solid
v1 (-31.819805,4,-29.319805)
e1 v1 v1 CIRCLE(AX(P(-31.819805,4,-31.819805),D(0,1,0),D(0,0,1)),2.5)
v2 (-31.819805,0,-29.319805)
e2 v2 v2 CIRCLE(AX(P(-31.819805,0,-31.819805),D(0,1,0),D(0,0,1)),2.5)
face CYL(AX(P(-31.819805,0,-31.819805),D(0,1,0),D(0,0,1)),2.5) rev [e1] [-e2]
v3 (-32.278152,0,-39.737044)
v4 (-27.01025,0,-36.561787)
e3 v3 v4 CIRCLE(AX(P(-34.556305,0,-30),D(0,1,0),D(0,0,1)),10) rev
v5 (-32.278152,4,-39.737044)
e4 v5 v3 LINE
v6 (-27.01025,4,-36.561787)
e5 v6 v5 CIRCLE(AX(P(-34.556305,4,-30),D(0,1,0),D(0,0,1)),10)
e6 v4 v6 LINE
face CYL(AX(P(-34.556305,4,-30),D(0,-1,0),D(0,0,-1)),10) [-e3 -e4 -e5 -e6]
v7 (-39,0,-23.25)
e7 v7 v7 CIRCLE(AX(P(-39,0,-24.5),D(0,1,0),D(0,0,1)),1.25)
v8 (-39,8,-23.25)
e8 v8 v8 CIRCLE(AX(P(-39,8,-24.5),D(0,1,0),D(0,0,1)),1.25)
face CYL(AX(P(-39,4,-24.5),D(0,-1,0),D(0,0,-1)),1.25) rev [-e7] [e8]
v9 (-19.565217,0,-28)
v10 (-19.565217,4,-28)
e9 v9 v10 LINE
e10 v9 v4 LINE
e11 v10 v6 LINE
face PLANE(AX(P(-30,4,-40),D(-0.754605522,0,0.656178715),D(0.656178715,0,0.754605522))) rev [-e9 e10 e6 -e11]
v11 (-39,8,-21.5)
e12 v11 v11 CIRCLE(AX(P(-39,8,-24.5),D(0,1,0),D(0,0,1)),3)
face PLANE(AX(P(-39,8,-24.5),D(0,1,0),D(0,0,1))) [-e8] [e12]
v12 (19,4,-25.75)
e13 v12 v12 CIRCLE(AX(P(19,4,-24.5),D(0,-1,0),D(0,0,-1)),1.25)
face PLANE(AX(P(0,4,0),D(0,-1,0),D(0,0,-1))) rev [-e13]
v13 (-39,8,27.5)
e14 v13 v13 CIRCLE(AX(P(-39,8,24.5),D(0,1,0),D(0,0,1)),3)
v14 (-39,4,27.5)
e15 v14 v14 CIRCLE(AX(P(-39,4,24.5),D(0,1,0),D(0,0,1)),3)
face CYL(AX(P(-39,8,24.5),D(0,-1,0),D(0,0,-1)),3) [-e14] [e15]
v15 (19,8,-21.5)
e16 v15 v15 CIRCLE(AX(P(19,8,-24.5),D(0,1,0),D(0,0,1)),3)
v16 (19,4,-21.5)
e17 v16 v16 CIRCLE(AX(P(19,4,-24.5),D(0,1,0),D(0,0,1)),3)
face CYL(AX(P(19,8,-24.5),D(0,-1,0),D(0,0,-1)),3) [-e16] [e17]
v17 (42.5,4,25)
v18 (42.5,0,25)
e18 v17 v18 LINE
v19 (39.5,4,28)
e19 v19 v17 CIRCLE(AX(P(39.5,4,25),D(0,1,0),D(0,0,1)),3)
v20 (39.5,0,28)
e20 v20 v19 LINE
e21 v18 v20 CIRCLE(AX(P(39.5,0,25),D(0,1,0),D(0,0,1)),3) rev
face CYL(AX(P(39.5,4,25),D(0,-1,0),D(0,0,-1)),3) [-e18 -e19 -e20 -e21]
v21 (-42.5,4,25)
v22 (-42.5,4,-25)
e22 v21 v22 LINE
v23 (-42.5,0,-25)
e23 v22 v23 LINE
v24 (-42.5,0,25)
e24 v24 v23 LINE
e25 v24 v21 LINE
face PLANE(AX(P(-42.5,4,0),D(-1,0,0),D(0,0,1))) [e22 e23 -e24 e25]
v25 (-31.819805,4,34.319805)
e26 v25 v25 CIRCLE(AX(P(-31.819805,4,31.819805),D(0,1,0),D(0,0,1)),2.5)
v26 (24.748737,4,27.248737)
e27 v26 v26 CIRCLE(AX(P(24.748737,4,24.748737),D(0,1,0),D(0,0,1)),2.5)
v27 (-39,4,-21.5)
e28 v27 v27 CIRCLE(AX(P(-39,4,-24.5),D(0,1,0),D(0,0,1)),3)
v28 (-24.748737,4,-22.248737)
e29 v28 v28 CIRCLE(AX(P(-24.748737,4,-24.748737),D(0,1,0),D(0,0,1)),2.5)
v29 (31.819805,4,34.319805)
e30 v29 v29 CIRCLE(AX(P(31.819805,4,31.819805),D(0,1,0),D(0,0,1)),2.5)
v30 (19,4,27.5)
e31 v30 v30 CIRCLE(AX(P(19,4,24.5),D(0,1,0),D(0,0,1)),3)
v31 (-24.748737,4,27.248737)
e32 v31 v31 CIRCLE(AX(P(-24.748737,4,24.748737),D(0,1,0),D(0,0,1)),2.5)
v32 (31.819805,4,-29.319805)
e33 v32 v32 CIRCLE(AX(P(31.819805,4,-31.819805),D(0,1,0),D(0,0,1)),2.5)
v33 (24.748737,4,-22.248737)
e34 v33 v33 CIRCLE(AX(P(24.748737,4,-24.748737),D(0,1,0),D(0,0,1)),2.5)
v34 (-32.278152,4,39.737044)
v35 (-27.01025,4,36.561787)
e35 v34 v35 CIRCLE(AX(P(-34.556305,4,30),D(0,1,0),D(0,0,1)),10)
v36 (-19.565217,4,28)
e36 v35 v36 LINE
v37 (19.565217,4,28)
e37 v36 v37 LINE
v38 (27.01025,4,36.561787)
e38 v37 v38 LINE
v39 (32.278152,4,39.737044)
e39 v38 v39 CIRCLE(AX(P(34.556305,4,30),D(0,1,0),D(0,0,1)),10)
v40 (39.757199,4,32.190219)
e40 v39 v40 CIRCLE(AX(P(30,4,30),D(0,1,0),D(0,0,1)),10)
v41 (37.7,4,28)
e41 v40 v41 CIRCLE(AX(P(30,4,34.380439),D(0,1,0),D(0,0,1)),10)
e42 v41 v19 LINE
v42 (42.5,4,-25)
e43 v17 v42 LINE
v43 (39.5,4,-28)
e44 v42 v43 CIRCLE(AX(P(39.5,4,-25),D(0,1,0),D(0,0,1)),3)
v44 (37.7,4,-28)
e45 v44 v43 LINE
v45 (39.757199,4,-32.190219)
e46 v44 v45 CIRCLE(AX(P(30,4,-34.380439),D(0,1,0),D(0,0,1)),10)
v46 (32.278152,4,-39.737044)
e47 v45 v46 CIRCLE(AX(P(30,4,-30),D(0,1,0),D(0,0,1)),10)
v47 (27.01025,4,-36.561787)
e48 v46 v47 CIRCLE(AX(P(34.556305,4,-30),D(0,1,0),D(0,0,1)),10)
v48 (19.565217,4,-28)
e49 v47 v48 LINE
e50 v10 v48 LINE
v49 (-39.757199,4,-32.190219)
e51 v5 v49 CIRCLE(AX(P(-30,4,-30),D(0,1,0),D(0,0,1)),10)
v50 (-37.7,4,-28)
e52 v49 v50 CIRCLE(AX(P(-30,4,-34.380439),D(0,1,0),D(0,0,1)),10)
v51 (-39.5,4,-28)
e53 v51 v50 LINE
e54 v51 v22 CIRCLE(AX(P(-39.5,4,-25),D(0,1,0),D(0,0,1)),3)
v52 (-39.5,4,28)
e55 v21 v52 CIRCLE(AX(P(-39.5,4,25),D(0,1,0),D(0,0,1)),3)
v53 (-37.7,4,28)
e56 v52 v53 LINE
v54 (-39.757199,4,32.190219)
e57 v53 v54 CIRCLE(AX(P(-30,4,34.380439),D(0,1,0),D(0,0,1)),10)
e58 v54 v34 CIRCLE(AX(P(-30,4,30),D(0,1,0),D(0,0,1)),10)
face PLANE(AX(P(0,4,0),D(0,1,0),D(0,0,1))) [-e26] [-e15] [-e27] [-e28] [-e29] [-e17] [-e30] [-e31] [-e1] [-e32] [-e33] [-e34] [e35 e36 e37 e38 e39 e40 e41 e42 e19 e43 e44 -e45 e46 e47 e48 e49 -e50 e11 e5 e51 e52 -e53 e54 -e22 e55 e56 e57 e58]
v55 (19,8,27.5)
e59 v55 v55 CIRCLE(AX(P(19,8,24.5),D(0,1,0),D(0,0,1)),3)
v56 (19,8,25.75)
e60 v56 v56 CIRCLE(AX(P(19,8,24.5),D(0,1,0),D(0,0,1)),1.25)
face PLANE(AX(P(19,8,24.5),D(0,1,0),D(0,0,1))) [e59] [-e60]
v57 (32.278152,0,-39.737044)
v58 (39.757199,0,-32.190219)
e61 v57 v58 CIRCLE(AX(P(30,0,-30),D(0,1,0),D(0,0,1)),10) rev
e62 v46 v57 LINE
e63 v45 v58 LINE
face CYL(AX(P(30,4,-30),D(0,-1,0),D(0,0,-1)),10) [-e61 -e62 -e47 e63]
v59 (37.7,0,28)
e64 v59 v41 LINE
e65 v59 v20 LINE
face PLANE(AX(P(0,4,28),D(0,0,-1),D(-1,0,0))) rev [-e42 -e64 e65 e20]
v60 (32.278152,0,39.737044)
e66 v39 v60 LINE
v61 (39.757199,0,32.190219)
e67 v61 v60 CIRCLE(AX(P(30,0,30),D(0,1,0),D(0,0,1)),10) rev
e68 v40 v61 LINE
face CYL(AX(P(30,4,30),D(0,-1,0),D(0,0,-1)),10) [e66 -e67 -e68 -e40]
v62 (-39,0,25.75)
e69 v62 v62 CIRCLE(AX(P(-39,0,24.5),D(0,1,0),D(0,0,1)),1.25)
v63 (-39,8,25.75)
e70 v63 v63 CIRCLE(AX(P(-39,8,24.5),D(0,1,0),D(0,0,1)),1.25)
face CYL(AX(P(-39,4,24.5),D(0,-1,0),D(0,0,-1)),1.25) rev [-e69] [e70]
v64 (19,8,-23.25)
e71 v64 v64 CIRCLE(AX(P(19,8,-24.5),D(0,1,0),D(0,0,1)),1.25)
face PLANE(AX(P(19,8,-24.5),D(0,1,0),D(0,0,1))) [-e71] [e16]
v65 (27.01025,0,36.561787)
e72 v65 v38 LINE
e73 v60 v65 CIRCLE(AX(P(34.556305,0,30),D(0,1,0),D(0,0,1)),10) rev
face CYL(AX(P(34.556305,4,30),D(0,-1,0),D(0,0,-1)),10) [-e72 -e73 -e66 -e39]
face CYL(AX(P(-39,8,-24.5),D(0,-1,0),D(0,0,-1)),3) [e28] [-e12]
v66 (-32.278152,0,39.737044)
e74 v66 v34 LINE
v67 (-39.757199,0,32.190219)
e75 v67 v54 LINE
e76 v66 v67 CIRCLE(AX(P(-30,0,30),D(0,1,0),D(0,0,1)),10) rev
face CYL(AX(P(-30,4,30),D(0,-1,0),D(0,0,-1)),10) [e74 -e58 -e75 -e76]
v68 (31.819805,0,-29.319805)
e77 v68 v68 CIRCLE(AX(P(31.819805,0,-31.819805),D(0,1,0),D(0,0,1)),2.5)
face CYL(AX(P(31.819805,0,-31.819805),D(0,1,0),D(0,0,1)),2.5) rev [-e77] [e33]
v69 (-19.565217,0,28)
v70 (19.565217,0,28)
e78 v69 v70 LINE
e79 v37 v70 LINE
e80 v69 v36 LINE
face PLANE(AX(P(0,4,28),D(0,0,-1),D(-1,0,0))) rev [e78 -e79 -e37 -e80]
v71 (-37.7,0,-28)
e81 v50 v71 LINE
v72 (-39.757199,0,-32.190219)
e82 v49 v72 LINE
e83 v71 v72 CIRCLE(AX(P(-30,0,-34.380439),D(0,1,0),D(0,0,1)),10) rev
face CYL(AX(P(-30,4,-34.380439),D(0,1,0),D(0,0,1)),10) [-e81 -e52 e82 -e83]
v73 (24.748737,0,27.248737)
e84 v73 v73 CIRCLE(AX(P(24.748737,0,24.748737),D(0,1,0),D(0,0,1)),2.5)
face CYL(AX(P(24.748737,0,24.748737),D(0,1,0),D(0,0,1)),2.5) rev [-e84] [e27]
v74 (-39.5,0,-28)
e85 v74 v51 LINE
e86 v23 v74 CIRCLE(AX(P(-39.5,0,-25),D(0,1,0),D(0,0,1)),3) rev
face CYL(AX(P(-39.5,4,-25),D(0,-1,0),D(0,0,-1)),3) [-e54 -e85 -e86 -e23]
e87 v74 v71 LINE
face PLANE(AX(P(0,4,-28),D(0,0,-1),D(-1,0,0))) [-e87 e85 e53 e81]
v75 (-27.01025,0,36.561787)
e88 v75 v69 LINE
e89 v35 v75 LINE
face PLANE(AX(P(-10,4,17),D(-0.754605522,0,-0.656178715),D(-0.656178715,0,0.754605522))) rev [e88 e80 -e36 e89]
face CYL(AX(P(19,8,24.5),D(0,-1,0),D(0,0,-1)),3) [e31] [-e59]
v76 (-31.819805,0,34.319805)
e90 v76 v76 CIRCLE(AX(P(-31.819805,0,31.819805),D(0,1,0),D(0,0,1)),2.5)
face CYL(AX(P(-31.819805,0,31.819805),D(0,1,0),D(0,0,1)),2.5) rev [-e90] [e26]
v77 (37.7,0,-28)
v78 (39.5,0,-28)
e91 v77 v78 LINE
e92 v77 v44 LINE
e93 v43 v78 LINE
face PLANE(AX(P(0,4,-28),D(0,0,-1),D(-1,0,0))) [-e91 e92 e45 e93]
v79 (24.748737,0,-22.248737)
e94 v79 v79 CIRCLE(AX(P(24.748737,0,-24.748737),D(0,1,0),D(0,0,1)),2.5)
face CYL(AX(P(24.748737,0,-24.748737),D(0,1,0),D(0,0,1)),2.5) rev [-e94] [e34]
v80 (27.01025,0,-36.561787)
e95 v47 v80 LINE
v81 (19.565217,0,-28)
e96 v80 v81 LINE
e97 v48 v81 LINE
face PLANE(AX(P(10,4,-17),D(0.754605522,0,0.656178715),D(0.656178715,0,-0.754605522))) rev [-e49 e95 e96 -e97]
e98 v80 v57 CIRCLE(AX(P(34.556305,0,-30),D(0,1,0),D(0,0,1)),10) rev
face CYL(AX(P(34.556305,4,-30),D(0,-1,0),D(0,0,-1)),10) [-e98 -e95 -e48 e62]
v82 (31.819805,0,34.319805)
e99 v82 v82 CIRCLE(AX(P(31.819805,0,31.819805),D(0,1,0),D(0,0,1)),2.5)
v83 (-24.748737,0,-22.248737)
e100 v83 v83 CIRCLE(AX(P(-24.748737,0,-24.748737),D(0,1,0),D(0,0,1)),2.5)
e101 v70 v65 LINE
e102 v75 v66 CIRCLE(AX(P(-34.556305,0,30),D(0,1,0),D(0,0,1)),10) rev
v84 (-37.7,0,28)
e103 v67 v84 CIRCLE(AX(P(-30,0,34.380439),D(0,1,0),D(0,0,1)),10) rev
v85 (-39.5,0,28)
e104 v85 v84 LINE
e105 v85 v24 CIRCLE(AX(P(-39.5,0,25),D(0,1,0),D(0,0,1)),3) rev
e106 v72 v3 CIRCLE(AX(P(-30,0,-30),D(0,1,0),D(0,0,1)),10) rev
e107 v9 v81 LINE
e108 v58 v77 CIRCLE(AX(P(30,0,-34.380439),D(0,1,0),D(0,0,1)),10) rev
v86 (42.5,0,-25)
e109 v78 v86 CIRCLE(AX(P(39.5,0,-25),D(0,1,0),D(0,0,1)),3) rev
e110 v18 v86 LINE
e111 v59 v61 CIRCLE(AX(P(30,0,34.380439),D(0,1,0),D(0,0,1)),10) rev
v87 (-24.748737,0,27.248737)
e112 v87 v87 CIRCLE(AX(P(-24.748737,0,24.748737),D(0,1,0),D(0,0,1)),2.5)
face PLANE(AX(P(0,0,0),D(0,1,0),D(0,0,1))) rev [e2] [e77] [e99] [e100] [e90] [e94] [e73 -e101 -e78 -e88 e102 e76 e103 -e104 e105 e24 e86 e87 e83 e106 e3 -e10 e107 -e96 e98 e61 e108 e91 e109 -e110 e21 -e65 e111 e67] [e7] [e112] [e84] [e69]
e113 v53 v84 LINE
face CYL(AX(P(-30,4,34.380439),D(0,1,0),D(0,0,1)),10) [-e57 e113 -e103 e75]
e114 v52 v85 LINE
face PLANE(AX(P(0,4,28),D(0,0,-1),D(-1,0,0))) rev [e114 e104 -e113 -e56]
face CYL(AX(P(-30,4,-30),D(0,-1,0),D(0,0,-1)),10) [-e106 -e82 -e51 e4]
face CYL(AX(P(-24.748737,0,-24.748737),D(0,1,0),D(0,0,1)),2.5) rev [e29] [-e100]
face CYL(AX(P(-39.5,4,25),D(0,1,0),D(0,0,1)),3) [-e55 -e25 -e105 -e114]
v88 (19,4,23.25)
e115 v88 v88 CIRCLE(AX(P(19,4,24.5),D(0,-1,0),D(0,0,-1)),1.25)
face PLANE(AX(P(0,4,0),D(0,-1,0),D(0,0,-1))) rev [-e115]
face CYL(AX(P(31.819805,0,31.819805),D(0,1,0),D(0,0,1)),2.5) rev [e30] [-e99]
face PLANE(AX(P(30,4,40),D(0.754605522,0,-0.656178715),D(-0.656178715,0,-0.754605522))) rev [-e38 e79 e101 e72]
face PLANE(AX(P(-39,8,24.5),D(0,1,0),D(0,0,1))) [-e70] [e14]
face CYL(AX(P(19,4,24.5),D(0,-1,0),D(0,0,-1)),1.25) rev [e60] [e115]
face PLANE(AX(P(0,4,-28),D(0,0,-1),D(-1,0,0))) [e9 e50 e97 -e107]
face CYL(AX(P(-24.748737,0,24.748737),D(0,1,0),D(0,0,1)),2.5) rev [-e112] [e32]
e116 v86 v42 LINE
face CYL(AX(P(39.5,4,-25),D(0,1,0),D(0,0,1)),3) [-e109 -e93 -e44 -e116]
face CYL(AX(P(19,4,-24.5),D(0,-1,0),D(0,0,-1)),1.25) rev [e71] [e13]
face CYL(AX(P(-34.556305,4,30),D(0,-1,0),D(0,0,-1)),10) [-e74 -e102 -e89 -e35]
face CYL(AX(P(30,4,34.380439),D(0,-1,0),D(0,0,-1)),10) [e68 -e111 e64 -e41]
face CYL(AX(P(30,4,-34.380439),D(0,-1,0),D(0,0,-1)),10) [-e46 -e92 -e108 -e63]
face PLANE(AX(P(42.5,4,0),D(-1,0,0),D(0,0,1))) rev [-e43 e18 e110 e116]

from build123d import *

# Parameters (mm, degrees)
SKETCH1_W           = 85
SKETCH1_H           = 56
SKETCH1_R           = 1.25
BOSS_EXTRUDE1_DEPTH = 4
SKETCH2_R           = 3
SKETCH2_R_2         = 1.25
BOSS_EXTRUDE2_DEPTH = 4
FILLET1_R           = 3
BOSS_EXTRUDE4_DEPTH = 4
SKETCH3_R           = 2.5
CUT_EXTRUDE1_DEPTH  = 59.5
FILLET2_R           = 10


with BuildPart() as part:
    # Sketch1 → Boss-Extrude1 (new body)
    with BuildSketch(Plane(origin=(0, 0, 0), x_dir=(1, 0, 0), z_dir=(0, 1, 0))):
        Rectangle(SKETCH1_W, SKETCH1_H)
        with Locations(Location((-39, 24.5, 0), (0, 0, 270))):
            Circle(SKETCH1_R, mode=Mode.SUBTRACT)
        with Locations(Location((-39, -24.5, 0), (0, 0, 270))):
            Circle(SKETCH1_R, mode=Mode.SUBTRACT)
        with Locations(Location((19, 24.5, 0), (0, 0, 270))):
            Circle(SKETCH1_R, mode=Mode.SUBTRACT)
        with Locations(Location((19, -24.5, 0), (0, 0, 270))):
            Circle(SKETCH1_R, mode=Mode.SUBTRACT)
    extrude(amount=BOSS_EXTRUDE1_DEPTH)

    # Sketch2 → Boss-Extrude2 (add)
    # profile 1 of 4: a face of its own
    with BuildSketch(Plane(origin=(0, 4, 0), x_dir=(1, 0, 0), z_dir=(0, 1, 0))):
        with Locations(Location((-39, 24.5, 0), (0, 0, 270))):
            Circle(SKETCH2_R)
        with Locations(Location((-39, 24.5, 0), (0, 0, 270))):
            Circle(SKETCH2_R_2, mode=Mode.SUBTRACT)
    # profile 2 of 4: a face of its own
    with BuildSketch(Plane(origin=(0, 4, 0), x_dir=(1, 0, 0), z_dir=(0, 1, 0))):
        with Locations(Location((19, 24.5, 0), (0, 0, 270))):
            Circle(SKETCH2_R)
        with Locations(Location((19, 24.5, 0), (0, 0, 270))):
            Circle(SKETCH2_R_2, mode=Mode.SUBTRACT)
    # profile 3 of 4: a face of its own
    with BuildSketch(Plane(origin=(0, 4, 0), x_dir=(1, 0, 0), z_dir=(0, 1, 0))):
        with Locations(Location((19, -24.5, 0), (0, 0, 270))):
            Circle(SKETCH2_R)
        with Locations(Location((19, -24.5, 0), (0, 0, 270))):
            Circle(SKETCH2_R_2, mode=Mode.SUBTRACT)
    # profile 4 of 4: a face of its own
    with BuildSketch(Plane(origin=(0, 4, 0), x_dir=(1, 0, 0), z_dir=(0, 1, 0))):
        with Locations(Location((-39, -24.5, 0), (0, 0, 270))):
            Circle(SKETCH2_R)
        with Locations(Location((-39, -24.5, 0), (0, 0, 270))):
            Circle(SKETCH2_R_2, mode=Mode.SUBTRACT)
    extrude(amount=BOSS_EXTRUDE2_DEPTH)

    # Fillet1
    fillet1_edges = [part.edges().sort_by_distance(p)[0] for p in [
        (-42.5, 2, 28),
        (-42.5, 2, -28),
        (42.5, 2, -28),
        (42.5, 2, 28),
    ]]
    fillet(fillet1_edges, radius=FILLET1_R)

    # Sketch5 → Boss-Extrude4 (add)
    with BuildSketch(Plane(origin=(0, 0, 0), x_dir=(1, 0, 0), z_dir=(0, 1, 0))):
        Polygon((-40, -30), (-17, -10), (-17, 10), (-40, 30), (-40, 40), (-30, 40), (-10, 17), (10, 17), (30, 40), (40, 40), (40, 30), (17, 10), (17, -10), (40, -30), (40, -40), (30, -40), (10, -17), (-10, -17), (-30, -40), (-40, -40), align=None)
    extrude(amount=BOSS_EXTRUDE4_DEPTH)

    # Sketch3 → Cut-Extrude1 (cut, through all)
    with BuildSketch(Plane(origin=(0, 4, 0), x_dir=(1, 0, 0), z_dir=(0, 1, 0))):
        with Locations(Location((-31.819805153, 31.819805153, 0), (0, 0, 270))):
            Circle(SKETCH3_R)
        with Locations(Location((-24.748737342, 24.748737342, 0), (0, 0, 270))):
            Circle(SKETCH3_R)
        with Locations(Location((31.819805153, 31.819805153, 0), (0, 0, 270))):
            Circle(SKETCH3_R)
        with Locations(Location((24.748737342, 24.748737342, 0), (0, 0, 270))):
            Circle(SKETCH3_R)
        with Locations(Location((24.748737342, -24.748737342, 0), (0, 0, 270))):
            Circle(SKETCH3_R)
        with Locations(Location((31.819805153, -31.819805153, 0), (0, 0, 270))):
            Circle(SKETCH3_R)
        with Locations(Location((-31.819805153, -31.819805153, 0), (0, 0, 270))):
            Circle(SKETCH3_R)
        with Locations(Location((-24.748737342, -24.748737342, 0), (0, 0, 270))):
            Circle(SKETCH3_R)
    extrude(amount=-CUT_EXTRUDE1_DEPTH, mode=Mode.SUBTRACT)

    # Fillet2
    # the kernel refuses this fillet: 10 mm, written as the material it takes off along each edge
    with BuildSketch(Plane(origin=(-40, -10.951097141, -30), x_dir=(0.7546055221635131, 0, 0.6561787149247771), z_dir=(0, 1, 0))) as fillet2_piece_1_section:
        with BuildLine():
            CenterArc((4.671704482, 9.8672905), FILLET2_R, 221.009086902, 39.646111147)
            Line((-2.87435074, 3.305503351), (-3.025271844, 3.174267608))
            Line((-3.025271844, 3.174267608), (-0.150921104, -0.131235743))
            Line((-0.150921104, -0.131235743), (0, -0.2))
            ThreePointArc((0, -0.2), (1.523975065, -0.2), (3.015475044, -0.19734581))
            Line((3.015475044, -0.19734581), (3.047950131, 0))
        make_face()
    fillet2_piece_1 = extrude(amount=25.902194282, mode=Mode.PRIVATE)
    fillet2_piece_1 = split(fillet2_piece_1, bisect_by=Plane(origin=(-39.506364614, 2, -28), z_dir=(0, 0, -1)), keep=Keep.TOP, mode=Mode.PRIVATE)
    add(fillet2_piece_1, mode=Mode.SUBTRACT)
    with BuildSketch(Plane(origin=(-40, -25, -40), x_dir=(0, 0, 1), z_dir=(0, 1, 0)), Plane(origin=(40, -25, -40), x_dir=(-1, 0, 0), z_dir=(0, 1, 0))) as fillet2_piece_2:
        with BuildLine():
            CenterArc((FILLET2_R, FILLET2_R), FILLET2_R, 180, 90)
            Line((0, FILLET2_R), (-FILLET2_R * 0.02, FILLET2_R))
            Line((-FILLET2_R * 0.02, FILLET2_R), (-FILLET2_R * 0.02, -FILLET2_R * 0.02))
            Line((-FILLET2_R * 0.02, -FILLET2_R * 0.02), (FILLET2_R, -FILLET2_R * 0.02))
            Line((FILLET2_R, -FILLET2_R * 0.02), (FILLET2_R, 0))
        make_face()
    extrude(amount=54, mode=Mode.SUBTRACT)
    with BuildSketch(Plane(origin=(-30, -11.390762292, -40), x_dir=(-1, 0, 0), z_dir=(0, 1, 0)), Plane(origin=(30, -11.390762292, -40), x_dir=(-0.6561787149247741, 0, 0.7546055221635154), z_dir=(0, 1, 0))) as fillet2_piece_3:
        with BuildLine():
            CenterArc((FILLET2_R * 0.455630491663, FILLET2_R), FILLET2_R, 221.009086902, 48.990913098)
            Line((-FILLET2_R * 0.2989750305, FILLET2_R * 0.343821285075), (-FILLET2_R * 0.314067140943, FILLET2_R * 0.330697710777))
            Line((-FILLET2_R * 0.314067140943, FILLET2_R * 0.330697710777), (-FILLET2_R * 0.00911260983327, -FILLET2_R * 0.02))
            Line((-FILLET2_R * 0.00911260983327, -FILLET2_R * 0.02), (FILLET2_R * 0.455630491663, -FILLET2_R * 0.02))
            Line((FILLET2_R * 0.455630491663, -FILLET2_R * 0.02), (FILLET2_R * 0.455630491663, 0))
        make_face()
    extrude(amount=26.781524583, mode=Mode.SUBTRACT)
    with BuildSketch(Plane(origin=(40, -10.951097141, -30), x_dir=(0, 0, -1), z_dir=(0, 1, 0))) as fillet2_piece_4_section:
        with BuildLine():
            CenterArc((4.380438856, 10), FILLET2_R, 230.353888853, 39.646111147)
            Line((-2, 2.3), (-2.127608777, 2.146))
            ThreePointArc((-2.127608777, 2.146), (-1.150921104, 1.018764257), (-0.150921104, -0.131235743))
            Line((-0.150921104, -0.131235743), (0, -0.2))
            Line((0, -0.2), (4.380438856, -0.2))
            Line((4.380438856, -0.2), (4.380438856, 0))
        make_face()
    fillet2_piece_4 = extrude(amount=25.902194282, mode=Mode.PRIVATE)
    fillet2_piece_4 = split(fillet2_piece_4, bisect_by=Plane(origin=(39.506364614, 2, -28), z_dir=(0, 0, -1)), keep=Keep.TOP, mode=Mode.PRIVATE)
    add(fillet2_piece_4, mode=Mode.SUBTRACT)
    with BuildSketch(Plane(origin=(40, -10.951097141, 30), x_dir=(0, 0, 1), z_dir=(0, 1, 0))) as fillet2_piece_5_section:
        with BuildLine():
            CenterArc((4.380438856, -10), FILLET2_R, 90, 39.646111147)
            Line((-2, -2.3), (-2.127608777, -2.146))
            ThreePointArc((-2.127608777, -2.146), (-1.150921104, -1.018764257), (-0.150921104, 0.131235743))
            Line((-0.150921104, 0.131235743), (0, 0.2))
            Line((0, 0.2), (4.380438856, 0.2))
            Line((4.380438856, 0.2), (4.380438856, 0))
        make_face()
    fillet2_piece_5 = extrude(amount=25.902194282, mode=Mode.PRIVATE)
    fillet2_piece_5 = split(fillet2_piece_5, bisect_by=Plane(origin=(39.506364614, 2, 28), z_dir=(0, 0, 1)), keep=Keep.TOP, mode=Mode.PRIVATE)
    add(fillet2_piece_5, mode=Mode.SUBTRACT)
    with BuildSketch(Plane(origin=(40, -25, 40), x_dir=(-1, 0, 0), z_dir=(0, 1, 0)), Plane(origin=(-40, -25, 40), x_dir=(0, 0, -1), z_dir=(0, 1, 0))) as fillet2_piece_6:
        with BuildLine():
            CenterArc((FILLET2_R, -FILLET2_R), FILLET2_R, 90, 90)
            Line((0, -FILLET2_R), (-FILLET2_R * 0.02, -FILLET2_R))
            Line((-FILLET2_R * 0.02, -FILLET2_R), (-FILLET2_R * 0.02, FILLET2_R * 0.02))
            Line((-FILLET2_R * 0.02, FILLET2_R * 0.02), (FILLET2_R, FILLET2_R * 0.02))
            Line((FILLET2_R, FILLET2_R * 0.02), (FILLET2_R, 0))
        make_face()
    extrude(amount=54, mode=Mode.SUBTRACT)
    with BuildSketch(Plane(origin=(30, -11.390762292, 40), x_dir=(-0.6561787149247873, 0, -0.7546055221635042), z_dir=(0, 1, 0)), Plane(origin=(-30, -11.390762292, 40), x_dir=(-1, 0, 0), z_dir=(0, 1, 0))) as fillet2_piece_7:
        with BuildLine():
            CenterArc((FILLET2_R * 0.455630491663, -FILLET2_R), FILLET2_R, 90, 48.990913098)
            Line((-FILLET2_R * 0.2989750305, -FILLET2_R * 0.343821285075), (-FILLET2_R * 0.314067140943, -FILLET2_R * 0.330697710777))
            Line((-FILLET2_R * 0.314067140943, -FILLET2_R * 0.330697710777), (-FILLET2_R * 0.00911260983327, FILLET2_R * 0.02))
            Line((-FILLET2_R * 0.00911260983327, FILLET2_R * 0.02), (FILLET2_R * 0.455630491663, FILLET2_R * 0.02))
            Line((FILLET2_R * 0.455630491663, FILLET2_R * 0.02), (FILLET2_R * 0.455630491663, 0))
        make_face()
    extrude(amount=26.781524583, mode=Mode.SUBTRACT)
    with BuildSketch(Plane(origin=(-40, -10.951097141, 30), x_dir=(0.7546055221635047, 0, -0.6561787149247865), z_dir=(0, 1, 0))) as fillet2_piece_8_section:
        with BuildLine():
            CenterArc((4.671704482, -9.8672905), FILLET2_R, 99.344801951, 39.646111147)
            Line((-2.87435074, -3.305503351), (-3.025271844, -3.174267608))
            Line((-3.025271844, -3.174267608), (-0.150921104, 0.131235743))
            Line((-0.150921104, 0.131235743), (0, 0.2))
            ThreePointArc((0, 0.2), (1.523975065, 0.2), (3.015475044, 0.19734581))
            Line((3.015475044, 0.19734581), (3.047950131, 0))
        make_face()
    fillet2_piece_8 = extrude(amount=25.902194282, mode=Mode.PRIVATE)
    fillet2_piece_8 = split(fillet2_piece_8, bisect_by=Plane(origin=(-39.506364614, 2, 28), z_dir=(0, 0, 1)), keep=Keep.TOP, mode=Mode.PRIVATE)
    add(fillet2_piece_8, mode=Mode.SUBTRACT)


solid = part.part
